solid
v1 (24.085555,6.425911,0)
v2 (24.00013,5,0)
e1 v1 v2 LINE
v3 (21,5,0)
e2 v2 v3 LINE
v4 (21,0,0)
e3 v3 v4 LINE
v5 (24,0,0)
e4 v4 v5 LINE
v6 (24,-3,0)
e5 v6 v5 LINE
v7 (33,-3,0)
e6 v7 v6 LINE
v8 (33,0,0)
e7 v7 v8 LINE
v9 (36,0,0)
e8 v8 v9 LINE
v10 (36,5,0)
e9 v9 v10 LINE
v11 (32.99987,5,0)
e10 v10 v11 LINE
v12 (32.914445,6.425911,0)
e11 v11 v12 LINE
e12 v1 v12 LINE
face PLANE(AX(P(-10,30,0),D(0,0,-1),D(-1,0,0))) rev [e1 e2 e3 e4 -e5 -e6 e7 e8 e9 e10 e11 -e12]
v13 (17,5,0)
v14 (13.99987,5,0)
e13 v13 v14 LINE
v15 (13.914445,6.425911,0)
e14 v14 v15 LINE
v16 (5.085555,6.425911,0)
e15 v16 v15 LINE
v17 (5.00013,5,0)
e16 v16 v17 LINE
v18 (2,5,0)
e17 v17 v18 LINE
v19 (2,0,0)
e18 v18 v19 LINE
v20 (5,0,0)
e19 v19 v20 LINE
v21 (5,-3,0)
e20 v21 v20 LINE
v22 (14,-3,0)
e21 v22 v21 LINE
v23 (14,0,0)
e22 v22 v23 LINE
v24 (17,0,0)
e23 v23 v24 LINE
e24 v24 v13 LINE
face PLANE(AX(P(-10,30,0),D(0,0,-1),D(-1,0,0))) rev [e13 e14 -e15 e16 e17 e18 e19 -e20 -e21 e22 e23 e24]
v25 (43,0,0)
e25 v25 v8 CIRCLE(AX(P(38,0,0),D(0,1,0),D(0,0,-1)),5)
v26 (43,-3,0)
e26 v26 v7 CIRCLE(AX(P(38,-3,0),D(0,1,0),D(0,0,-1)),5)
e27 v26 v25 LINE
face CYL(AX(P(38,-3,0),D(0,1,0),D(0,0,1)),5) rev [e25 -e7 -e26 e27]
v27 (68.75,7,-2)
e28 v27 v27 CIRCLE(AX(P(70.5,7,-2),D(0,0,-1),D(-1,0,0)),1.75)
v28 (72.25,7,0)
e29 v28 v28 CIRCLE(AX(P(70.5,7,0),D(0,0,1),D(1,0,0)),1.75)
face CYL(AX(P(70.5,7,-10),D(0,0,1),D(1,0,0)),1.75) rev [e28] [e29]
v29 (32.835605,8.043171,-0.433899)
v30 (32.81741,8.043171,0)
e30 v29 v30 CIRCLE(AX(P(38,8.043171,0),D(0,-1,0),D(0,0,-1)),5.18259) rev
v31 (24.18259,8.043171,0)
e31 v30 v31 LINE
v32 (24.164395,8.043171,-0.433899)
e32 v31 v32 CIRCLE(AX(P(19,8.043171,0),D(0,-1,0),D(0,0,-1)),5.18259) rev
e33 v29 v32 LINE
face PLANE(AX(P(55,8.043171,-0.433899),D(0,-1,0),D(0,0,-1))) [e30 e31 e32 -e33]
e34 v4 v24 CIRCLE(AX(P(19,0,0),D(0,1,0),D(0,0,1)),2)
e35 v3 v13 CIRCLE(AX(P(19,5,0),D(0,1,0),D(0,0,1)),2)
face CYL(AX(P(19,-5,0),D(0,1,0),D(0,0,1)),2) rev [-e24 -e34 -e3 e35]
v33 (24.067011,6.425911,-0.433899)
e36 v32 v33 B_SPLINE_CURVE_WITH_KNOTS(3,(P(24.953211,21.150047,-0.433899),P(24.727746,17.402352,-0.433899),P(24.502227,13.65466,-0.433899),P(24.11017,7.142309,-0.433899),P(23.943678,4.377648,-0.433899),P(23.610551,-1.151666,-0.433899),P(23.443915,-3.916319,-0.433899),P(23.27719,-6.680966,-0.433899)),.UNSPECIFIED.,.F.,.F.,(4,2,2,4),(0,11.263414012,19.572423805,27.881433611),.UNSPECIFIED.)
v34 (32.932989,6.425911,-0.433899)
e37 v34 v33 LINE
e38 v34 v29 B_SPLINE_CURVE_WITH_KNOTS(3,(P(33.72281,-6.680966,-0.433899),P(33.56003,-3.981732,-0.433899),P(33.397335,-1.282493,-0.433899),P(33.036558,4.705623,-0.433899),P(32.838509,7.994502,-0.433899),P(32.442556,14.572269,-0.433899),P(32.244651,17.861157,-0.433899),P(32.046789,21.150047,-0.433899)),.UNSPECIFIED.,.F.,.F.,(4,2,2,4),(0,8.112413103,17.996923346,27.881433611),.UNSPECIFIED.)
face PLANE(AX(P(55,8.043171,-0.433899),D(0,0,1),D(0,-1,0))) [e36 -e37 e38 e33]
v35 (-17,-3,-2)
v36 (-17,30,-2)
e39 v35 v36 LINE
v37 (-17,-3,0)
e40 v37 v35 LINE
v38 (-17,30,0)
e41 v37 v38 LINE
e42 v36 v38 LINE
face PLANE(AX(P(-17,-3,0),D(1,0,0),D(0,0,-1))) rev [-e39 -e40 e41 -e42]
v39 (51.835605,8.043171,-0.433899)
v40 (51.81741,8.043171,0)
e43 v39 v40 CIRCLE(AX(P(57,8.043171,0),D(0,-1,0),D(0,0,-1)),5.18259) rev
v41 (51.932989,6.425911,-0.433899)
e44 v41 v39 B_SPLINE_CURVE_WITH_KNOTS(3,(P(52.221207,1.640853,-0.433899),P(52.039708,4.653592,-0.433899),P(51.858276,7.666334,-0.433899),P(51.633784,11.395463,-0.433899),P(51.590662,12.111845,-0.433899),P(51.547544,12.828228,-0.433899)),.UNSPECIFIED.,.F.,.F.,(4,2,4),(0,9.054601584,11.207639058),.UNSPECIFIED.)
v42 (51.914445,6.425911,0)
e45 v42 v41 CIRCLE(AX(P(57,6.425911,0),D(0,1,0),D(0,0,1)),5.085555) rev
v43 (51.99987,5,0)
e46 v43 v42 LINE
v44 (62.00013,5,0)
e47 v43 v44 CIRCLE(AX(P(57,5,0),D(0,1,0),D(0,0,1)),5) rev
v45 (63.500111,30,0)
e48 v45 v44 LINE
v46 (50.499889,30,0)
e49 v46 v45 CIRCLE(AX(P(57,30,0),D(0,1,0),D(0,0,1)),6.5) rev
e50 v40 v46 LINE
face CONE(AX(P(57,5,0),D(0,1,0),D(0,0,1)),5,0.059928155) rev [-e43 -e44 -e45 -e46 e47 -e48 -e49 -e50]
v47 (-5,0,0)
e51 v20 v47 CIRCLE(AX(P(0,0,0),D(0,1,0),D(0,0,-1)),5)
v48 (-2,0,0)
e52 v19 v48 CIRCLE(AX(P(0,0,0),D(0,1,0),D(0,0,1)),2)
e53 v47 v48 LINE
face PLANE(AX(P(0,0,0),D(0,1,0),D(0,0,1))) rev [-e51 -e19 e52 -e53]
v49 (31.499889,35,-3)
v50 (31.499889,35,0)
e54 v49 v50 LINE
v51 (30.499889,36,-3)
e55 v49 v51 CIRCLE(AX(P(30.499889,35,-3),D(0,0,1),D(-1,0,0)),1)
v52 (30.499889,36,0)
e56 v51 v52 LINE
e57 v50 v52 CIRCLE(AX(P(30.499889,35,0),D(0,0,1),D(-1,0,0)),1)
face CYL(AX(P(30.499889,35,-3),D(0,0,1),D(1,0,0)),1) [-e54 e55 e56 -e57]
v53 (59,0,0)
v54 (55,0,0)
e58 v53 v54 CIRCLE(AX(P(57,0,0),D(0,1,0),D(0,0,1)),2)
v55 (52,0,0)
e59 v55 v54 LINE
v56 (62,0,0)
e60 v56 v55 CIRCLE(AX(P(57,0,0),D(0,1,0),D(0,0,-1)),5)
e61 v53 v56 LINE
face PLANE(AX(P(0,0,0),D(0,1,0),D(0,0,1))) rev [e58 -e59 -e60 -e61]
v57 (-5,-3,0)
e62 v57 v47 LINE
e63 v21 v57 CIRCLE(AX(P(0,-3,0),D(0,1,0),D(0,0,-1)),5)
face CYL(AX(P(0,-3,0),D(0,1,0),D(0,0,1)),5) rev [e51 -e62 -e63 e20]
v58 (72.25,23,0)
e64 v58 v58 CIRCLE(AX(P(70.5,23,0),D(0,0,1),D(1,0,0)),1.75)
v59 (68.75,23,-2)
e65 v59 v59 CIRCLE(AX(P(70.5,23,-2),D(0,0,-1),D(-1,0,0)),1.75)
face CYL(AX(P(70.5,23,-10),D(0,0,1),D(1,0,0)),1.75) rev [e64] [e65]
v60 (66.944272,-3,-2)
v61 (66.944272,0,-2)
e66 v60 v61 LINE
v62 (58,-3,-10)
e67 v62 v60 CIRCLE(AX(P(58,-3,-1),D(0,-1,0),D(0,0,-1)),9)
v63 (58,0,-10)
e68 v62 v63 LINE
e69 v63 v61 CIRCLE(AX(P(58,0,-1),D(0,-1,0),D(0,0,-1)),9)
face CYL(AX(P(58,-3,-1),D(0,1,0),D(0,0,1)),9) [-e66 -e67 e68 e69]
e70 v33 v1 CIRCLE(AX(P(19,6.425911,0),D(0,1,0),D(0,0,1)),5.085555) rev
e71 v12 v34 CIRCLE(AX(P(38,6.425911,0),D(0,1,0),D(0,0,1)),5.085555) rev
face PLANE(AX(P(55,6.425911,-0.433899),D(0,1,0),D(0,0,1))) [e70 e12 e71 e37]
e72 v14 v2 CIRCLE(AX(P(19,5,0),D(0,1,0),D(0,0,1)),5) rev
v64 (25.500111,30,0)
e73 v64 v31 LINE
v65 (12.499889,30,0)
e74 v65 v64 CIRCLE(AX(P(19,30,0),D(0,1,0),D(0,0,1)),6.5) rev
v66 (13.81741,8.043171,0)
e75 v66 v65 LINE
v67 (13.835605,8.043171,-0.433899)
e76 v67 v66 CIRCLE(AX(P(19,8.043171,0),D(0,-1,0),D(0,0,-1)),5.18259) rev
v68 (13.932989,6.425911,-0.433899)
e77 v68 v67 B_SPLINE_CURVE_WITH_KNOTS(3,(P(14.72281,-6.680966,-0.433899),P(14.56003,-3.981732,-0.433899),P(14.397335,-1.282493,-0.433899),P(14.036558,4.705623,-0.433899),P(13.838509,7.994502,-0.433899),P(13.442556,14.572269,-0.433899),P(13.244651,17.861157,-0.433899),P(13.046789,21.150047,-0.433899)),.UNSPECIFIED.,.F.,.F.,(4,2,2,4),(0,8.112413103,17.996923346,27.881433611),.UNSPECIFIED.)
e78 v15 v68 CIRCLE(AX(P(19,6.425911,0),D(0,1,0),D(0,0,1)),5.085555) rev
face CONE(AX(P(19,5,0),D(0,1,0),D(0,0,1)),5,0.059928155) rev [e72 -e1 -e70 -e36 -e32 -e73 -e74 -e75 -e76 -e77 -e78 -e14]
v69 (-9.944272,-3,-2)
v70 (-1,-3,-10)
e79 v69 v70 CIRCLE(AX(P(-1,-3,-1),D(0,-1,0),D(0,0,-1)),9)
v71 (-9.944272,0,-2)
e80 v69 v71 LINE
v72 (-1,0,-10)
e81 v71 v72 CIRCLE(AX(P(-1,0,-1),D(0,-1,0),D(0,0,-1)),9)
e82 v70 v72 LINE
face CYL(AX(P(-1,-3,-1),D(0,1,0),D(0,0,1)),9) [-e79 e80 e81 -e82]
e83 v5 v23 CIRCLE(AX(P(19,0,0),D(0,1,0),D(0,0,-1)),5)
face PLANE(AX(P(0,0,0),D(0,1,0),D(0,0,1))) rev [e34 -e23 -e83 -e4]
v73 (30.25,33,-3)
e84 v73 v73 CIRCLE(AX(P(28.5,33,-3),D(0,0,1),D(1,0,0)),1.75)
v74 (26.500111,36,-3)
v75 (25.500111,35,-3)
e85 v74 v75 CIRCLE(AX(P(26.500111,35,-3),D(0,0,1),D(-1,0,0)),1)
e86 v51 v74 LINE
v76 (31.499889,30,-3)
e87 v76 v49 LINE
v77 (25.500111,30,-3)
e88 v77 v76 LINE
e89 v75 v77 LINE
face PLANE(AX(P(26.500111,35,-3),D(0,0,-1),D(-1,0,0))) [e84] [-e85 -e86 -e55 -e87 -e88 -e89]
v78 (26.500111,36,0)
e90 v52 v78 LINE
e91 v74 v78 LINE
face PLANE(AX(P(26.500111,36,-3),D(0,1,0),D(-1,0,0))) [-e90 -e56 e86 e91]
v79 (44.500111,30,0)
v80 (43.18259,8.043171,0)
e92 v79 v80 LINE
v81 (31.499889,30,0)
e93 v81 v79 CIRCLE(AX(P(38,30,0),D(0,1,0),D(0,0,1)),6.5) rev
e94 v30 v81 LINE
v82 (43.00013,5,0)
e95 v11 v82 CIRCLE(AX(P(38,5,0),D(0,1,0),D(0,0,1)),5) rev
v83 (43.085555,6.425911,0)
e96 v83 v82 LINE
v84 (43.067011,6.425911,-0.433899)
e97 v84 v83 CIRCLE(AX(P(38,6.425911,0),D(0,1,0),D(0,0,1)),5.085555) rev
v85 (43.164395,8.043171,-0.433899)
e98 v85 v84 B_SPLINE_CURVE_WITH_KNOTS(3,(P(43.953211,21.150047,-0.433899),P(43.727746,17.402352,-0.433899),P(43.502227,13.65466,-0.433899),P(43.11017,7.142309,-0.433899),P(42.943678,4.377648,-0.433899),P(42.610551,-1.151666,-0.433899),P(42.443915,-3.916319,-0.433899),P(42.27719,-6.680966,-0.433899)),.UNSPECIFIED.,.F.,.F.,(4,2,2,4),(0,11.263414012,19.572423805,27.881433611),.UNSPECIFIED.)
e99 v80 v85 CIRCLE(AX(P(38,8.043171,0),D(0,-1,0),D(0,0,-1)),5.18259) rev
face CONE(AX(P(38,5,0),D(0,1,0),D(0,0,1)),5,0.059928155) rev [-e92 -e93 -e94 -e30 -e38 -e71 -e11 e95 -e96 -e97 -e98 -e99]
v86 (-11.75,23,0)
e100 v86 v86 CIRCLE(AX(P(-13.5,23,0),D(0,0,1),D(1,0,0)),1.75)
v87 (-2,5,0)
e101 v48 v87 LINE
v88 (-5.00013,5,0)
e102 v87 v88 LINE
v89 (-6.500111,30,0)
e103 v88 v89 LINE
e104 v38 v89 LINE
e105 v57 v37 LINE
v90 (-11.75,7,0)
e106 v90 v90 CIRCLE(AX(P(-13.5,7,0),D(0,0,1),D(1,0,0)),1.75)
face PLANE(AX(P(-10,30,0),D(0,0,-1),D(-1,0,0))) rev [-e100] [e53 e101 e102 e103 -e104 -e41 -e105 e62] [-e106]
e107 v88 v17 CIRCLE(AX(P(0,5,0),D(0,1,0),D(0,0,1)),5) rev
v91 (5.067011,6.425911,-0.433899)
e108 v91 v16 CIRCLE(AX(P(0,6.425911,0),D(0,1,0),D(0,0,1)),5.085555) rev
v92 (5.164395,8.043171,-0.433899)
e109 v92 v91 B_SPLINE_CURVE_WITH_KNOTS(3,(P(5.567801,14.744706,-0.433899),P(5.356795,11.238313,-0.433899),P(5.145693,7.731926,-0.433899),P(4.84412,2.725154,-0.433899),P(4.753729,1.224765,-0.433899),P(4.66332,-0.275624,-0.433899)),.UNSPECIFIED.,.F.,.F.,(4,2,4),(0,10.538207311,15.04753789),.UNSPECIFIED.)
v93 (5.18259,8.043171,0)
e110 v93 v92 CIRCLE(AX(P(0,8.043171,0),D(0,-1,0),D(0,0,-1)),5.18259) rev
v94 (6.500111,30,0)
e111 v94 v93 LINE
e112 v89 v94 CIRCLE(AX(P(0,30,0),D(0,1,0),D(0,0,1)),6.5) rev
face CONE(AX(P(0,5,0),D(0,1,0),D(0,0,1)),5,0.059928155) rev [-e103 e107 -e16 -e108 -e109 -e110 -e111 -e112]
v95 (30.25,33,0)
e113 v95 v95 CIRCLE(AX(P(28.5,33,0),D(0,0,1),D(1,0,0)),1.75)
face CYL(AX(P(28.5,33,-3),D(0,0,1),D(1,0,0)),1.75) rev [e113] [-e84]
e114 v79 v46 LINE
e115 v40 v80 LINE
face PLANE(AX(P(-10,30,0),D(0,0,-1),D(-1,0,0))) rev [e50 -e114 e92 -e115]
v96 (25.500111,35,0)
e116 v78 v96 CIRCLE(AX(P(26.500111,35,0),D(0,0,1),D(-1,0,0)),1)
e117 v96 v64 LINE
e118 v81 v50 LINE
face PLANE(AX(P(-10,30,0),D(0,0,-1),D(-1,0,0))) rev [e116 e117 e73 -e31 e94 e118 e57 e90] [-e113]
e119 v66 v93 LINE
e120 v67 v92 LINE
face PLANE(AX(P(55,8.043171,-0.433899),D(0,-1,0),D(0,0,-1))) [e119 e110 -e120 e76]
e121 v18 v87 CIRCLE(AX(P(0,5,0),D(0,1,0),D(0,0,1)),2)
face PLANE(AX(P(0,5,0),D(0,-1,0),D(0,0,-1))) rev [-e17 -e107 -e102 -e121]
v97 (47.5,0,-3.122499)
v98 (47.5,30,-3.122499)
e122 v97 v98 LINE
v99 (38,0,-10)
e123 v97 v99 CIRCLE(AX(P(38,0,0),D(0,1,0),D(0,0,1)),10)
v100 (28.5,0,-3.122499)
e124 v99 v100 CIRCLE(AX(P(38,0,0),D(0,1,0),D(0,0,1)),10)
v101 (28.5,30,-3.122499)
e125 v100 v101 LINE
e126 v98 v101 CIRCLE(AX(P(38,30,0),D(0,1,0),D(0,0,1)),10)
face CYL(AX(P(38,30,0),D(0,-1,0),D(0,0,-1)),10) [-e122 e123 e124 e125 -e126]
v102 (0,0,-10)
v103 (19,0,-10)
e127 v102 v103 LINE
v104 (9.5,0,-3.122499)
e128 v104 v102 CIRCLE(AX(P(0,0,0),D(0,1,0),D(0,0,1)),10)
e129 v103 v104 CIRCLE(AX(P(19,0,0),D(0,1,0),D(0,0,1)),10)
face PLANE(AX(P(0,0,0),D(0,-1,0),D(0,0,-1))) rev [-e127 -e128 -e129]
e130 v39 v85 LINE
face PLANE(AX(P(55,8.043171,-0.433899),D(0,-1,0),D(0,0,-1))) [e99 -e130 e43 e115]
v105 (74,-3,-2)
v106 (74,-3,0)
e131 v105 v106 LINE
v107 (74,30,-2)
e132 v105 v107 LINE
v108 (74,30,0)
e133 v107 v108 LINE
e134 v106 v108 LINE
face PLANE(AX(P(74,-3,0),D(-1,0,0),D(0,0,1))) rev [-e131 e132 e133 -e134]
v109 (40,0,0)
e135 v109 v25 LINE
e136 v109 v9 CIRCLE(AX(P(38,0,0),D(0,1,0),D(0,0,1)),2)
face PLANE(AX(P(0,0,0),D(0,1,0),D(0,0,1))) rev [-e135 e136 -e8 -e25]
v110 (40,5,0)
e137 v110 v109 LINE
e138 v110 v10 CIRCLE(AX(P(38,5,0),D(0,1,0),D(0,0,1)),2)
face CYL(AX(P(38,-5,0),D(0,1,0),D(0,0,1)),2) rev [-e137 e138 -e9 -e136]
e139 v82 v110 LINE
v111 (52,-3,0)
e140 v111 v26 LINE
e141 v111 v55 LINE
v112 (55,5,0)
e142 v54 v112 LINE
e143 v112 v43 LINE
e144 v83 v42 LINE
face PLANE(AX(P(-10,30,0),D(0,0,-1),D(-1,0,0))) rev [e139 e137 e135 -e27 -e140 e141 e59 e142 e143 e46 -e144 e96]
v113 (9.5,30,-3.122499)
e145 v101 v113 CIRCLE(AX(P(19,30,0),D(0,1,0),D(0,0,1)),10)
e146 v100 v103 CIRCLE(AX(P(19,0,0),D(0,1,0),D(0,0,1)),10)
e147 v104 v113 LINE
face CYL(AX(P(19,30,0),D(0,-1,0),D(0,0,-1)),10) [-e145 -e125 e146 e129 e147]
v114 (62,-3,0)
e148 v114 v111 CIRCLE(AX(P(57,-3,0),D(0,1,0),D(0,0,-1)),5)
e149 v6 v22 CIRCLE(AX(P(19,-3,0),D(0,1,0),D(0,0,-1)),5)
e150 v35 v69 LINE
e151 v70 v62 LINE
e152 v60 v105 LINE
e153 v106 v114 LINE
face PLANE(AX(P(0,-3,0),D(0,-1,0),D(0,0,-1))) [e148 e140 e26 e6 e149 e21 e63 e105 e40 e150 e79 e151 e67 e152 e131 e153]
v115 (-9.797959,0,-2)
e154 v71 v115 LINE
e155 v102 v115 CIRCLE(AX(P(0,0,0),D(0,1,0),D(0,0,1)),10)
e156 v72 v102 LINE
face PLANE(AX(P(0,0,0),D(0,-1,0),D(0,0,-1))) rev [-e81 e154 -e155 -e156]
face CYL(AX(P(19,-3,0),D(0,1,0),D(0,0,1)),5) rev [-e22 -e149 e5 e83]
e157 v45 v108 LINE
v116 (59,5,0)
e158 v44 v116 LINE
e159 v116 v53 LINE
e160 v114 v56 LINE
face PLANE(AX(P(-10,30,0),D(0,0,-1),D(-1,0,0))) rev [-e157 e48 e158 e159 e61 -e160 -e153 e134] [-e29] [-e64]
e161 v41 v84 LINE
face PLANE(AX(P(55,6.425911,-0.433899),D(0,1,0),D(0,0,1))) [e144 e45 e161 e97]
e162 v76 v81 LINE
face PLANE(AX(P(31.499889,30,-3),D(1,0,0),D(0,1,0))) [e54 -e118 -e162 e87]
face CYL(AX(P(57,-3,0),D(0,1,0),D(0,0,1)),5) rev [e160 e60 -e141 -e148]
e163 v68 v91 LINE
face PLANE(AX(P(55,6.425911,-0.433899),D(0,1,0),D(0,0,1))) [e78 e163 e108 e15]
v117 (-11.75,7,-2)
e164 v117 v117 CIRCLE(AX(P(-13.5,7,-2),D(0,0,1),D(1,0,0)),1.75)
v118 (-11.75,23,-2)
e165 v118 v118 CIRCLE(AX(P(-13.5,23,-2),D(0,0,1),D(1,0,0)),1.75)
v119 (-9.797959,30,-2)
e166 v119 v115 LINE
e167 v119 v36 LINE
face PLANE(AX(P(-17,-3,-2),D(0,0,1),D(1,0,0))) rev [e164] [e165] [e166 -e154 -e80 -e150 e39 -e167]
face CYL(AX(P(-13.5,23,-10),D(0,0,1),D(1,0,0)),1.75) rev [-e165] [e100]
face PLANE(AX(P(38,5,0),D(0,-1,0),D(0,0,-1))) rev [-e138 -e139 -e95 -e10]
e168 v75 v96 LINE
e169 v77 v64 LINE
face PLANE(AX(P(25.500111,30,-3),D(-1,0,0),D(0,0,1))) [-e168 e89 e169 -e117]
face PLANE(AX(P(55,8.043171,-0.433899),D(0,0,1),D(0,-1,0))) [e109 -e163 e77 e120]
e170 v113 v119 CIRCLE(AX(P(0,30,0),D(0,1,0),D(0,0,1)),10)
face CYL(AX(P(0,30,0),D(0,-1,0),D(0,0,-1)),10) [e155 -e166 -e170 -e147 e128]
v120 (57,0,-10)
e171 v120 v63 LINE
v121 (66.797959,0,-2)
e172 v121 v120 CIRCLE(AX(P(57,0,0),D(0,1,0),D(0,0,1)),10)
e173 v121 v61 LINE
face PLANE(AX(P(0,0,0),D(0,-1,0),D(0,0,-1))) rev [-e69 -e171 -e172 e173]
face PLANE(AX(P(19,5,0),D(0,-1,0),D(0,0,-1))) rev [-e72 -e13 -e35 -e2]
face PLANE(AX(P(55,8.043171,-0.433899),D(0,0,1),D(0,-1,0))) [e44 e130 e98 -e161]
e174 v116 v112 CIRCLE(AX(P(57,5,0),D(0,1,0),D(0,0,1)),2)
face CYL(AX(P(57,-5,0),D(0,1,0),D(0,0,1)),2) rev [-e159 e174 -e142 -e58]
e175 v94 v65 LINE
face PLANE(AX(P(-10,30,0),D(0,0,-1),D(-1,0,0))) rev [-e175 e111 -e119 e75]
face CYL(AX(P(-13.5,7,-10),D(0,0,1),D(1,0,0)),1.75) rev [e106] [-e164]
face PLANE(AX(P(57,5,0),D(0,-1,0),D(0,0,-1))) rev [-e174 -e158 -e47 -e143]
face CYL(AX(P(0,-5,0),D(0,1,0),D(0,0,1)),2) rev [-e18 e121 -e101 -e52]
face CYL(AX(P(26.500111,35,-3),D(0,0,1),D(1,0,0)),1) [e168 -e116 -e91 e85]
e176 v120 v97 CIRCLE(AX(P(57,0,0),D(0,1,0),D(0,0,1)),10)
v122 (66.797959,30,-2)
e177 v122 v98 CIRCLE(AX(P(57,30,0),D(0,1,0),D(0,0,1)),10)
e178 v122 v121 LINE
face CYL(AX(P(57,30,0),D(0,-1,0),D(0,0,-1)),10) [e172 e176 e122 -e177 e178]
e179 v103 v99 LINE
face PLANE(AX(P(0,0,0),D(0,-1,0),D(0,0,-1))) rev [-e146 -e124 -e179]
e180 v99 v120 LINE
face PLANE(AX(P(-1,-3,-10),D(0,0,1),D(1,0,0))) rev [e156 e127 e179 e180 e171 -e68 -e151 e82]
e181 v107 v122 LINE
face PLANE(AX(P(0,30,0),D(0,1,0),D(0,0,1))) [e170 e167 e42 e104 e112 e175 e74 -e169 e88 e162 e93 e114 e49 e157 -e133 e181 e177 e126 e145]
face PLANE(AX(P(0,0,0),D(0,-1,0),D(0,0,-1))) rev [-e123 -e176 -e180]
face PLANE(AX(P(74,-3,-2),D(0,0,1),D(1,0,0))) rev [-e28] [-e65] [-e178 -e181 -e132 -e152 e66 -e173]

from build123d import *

# Parameters (mm, degrees)
BOSS_EXTRUDE1_DEPTH   = 30
SKETCH4_R             = 2
CUT_EXTRUDE1_DEPTH    = 10
LPATTERN9_COUNT       = 4
LPATTERN9_PITCH       = 19
SKETCH5_W             = 9.377010815
SKETCH5_H             = 30
BOSS_EXTRUDE2_DEPTH   = 2
SKETCH5_W_2           = 8.706514496
BOSS_EXTRUDE2_2_DEPTH = 2
SKETCH6_R             = 1.75
CUT_EXTRUDE2_DEPTH    = 81.473598155
BOSS_EXTRUDE4_DEPTH   = 3
SKETCH10_W            = 1.262251727
SKETCH10_H            = 1.617260026
CUT_EXTRUDE3_DEPTH    = 55
SKETCH11_R            = 1.75
BOSS_EXTRUDE5_DEPTH   = 3


# Read off the part's stored shape, not the designer's step: Boundary-Cut1
with BuildPart() as part:
    # Sketch1 → Boss-Extrude1 (new body)
    with BuildSketch(Plane(origin=(0, 0, 0), x_dir=(1, 0, 0), z_dir=(0, 1, 0))):
        with BuildLine():
            Line((-10, 0), (10, 0))
            ThreePointArc((10, 0), (0, 10), (-10, 0))
        make_face()
    boss_extrude1 = extrude(amount=BOSS_EXTRUDE1_DEPTH)

    # Boundary-Cut1 outline → Boundary-Cut1 (revolve, cut)
    with BuildSketch(Plane.XY):
        Polygon((0, 30.000006646), (0, 5), (5, 5), (6.500000399, 30.000006646), align=None)
    boundary_cut1 = revolve(axis=Axis((0, 0, 0), (0, 1, 0)), mode=Mode.SUBTRACT)

    # Sketch4 → Cut-Extrude1 (cut)
    with BuildSketch(Plane(origin=(0, 5, 0), x_dir=(1, 0, 0), z_dir=(0, 1, 0))):
        Circle(SKETCH4_R)
    cut_extrude1 = extrude(amount=-CUT_EXTRUDE1_DEPTH, mode=Mode.SUBTRACT)

    # LPattern9: Boss-Extrude1, Boundary-Cut1, Cut-Extrude1 ×4
    with Locations(*[(i * LPATTERN9_PITCH, 0, 0) for i in range(1, LPATTERN9_COUNT)]):
        add(boss_extrude1)
        add(boundary_cut1, mode=Mode.SUBTRACT)
        add(cut_extrude1, mode=Mode.SUBTRACT)



with BuildPart() as body_2:
    # Sketch5 → Boss-Extrude2 (new body)
    with BuildSketch(Plane.XY):
        with Locations((-12.311494593, 15)):
            Rectangle(SKETCH5_W, SKETCH5_H)
    extrude(amount=-BOSS_EXTRUDE2_DEPTH)


with BuildPart() as body_3:
    # Sketch5 → Boss-Extrude2 2 (new body)
    with BuildSketch(Plane.XY):
        with Locations((69.646742752, 15)):
            Rectangle(SKETCH5_W_2, SKETCH5_H)
    extrude(amount=-BOSS_EXTRUDE2_2_DEPTH)


with BuildPart() as cut_extrude2_tool:
    # Sketch6 → Cut-Extrude2 (new, through all)
    with BuildSketch(Plane.XY):
        with Locations((-13.5, 23)):
            Circle(SKETCH6_R)
        with Locations((-13.5, 7)):
            Circle(SKETCH6_R)
        with Locations((70.5, 23)):
            Circle(SKETCH6_R)
        with Locations((70.5, 7)):
            Circle(SKETCH6_R)
    extrude(amount=-CUT_EXTRUDE2_DEPTH)


with BuildPart() as body_2_1:
    add(body_2.part)

    # Cut-Extrude2: cut by cut_extrude2_tool
    add(cut_extrude2_tool.part, mode=Mode.SUBTRACT)


with BuildPart() as body_3_1:
    add(body_3.part)

    # Cut-Extrude2: cut by cut_extrude2_tool
    add(cut_extrude2_tool.part, mode=Mode.SUBTRACT)


with BuildPart() as part_1:
    add(part.part)

    add(body_2_1.part)  # Boss-Extrude4 merges body 2

    add(body_3_1.part)  # Boss-Extrude4 merges body 3
    # Sketch9 → Boss-Extrude4 (add)
    with BuildSketch(Plane.XZ):
        with BuildLine():
            Line((5, 0), (14, 0))
            ThreePointArc((14, 0), (19, -5), (24, 0))
            Line((24, 0), (33, 0))
            ThreePointArc((33, 0), (38, -5), (43, 0))
            Line((43, 0), (52, 0))
            ThreePointArc((52, 0), (57, -5), (62, 0))
            Line((62, 0), (67, 0))
            Line((67, 0), (74, 0))
            Line((74, 0), (74, -2))
            Line((74, -2), (66.94427191, -2))
            ThreePointArc((66.94427191, -2), (64, -7.708203932), (58, -10))
            Line((58, -10), (-1, -10))
            ThreePointArc((-1, -10), (-7, -7.708203932), (-9.94427191, -2))
            Line((-9.94427191, -2), (-17, -2))
            Line((-17, -2), (-17, 0))
            Line((-17, 0), (-10, 0))
            Line((-10, 0), (-5, 0))
            ThreePointArc((-5, 0), (0, -5), (5, 0))
        make_face()
    extrude(amount=BOSS_EXTRUDE4_DEPTH)

    # Sketch10 → Cut-Extrude3 (cut)
    with BuildSketch(Plane(origin=(0, 0, 0), x_dir=(0, 0, -1), z_dir=(1, 0, 0))):
        with Locations((-0.197226833, 7.234540745)):
            Rectangle(SKETCH10_W, SKETCH10_H)
    extrude(amount=CUT_EXTRUDE3_DEPTH, mode=Mode.SUBTRACT)

    # Sketch11 → Boss-Extrude5 (add)
    with BuildSketch(Plane.XY):
        with BuildLine():
            Line((25.500111158, 30), (31.499888841, 30))
            Line((31.499888841, 30), (31.499888841, 35))
            ThreePointArc((31.499888841, 35), (31.206995622, 35.707106781), (30.499888841, 36))
            Line((30.499888841, 36), (26.500111158, 36))
            ThreePointArc((26.500111158, 36), (25.793004377, 35.707106781), (25.500111158, 35))
            Line((25.500111158, 35), (25.500111158, 30))
        make_face()
        with Locations((28.5, 33)):
            Circle(SKETCH11_R, mode=Mode.SUBTRACT)
    extrude(amount=-BOSS_EXTRUDE5_DEPTH)


solid = part_1.part
